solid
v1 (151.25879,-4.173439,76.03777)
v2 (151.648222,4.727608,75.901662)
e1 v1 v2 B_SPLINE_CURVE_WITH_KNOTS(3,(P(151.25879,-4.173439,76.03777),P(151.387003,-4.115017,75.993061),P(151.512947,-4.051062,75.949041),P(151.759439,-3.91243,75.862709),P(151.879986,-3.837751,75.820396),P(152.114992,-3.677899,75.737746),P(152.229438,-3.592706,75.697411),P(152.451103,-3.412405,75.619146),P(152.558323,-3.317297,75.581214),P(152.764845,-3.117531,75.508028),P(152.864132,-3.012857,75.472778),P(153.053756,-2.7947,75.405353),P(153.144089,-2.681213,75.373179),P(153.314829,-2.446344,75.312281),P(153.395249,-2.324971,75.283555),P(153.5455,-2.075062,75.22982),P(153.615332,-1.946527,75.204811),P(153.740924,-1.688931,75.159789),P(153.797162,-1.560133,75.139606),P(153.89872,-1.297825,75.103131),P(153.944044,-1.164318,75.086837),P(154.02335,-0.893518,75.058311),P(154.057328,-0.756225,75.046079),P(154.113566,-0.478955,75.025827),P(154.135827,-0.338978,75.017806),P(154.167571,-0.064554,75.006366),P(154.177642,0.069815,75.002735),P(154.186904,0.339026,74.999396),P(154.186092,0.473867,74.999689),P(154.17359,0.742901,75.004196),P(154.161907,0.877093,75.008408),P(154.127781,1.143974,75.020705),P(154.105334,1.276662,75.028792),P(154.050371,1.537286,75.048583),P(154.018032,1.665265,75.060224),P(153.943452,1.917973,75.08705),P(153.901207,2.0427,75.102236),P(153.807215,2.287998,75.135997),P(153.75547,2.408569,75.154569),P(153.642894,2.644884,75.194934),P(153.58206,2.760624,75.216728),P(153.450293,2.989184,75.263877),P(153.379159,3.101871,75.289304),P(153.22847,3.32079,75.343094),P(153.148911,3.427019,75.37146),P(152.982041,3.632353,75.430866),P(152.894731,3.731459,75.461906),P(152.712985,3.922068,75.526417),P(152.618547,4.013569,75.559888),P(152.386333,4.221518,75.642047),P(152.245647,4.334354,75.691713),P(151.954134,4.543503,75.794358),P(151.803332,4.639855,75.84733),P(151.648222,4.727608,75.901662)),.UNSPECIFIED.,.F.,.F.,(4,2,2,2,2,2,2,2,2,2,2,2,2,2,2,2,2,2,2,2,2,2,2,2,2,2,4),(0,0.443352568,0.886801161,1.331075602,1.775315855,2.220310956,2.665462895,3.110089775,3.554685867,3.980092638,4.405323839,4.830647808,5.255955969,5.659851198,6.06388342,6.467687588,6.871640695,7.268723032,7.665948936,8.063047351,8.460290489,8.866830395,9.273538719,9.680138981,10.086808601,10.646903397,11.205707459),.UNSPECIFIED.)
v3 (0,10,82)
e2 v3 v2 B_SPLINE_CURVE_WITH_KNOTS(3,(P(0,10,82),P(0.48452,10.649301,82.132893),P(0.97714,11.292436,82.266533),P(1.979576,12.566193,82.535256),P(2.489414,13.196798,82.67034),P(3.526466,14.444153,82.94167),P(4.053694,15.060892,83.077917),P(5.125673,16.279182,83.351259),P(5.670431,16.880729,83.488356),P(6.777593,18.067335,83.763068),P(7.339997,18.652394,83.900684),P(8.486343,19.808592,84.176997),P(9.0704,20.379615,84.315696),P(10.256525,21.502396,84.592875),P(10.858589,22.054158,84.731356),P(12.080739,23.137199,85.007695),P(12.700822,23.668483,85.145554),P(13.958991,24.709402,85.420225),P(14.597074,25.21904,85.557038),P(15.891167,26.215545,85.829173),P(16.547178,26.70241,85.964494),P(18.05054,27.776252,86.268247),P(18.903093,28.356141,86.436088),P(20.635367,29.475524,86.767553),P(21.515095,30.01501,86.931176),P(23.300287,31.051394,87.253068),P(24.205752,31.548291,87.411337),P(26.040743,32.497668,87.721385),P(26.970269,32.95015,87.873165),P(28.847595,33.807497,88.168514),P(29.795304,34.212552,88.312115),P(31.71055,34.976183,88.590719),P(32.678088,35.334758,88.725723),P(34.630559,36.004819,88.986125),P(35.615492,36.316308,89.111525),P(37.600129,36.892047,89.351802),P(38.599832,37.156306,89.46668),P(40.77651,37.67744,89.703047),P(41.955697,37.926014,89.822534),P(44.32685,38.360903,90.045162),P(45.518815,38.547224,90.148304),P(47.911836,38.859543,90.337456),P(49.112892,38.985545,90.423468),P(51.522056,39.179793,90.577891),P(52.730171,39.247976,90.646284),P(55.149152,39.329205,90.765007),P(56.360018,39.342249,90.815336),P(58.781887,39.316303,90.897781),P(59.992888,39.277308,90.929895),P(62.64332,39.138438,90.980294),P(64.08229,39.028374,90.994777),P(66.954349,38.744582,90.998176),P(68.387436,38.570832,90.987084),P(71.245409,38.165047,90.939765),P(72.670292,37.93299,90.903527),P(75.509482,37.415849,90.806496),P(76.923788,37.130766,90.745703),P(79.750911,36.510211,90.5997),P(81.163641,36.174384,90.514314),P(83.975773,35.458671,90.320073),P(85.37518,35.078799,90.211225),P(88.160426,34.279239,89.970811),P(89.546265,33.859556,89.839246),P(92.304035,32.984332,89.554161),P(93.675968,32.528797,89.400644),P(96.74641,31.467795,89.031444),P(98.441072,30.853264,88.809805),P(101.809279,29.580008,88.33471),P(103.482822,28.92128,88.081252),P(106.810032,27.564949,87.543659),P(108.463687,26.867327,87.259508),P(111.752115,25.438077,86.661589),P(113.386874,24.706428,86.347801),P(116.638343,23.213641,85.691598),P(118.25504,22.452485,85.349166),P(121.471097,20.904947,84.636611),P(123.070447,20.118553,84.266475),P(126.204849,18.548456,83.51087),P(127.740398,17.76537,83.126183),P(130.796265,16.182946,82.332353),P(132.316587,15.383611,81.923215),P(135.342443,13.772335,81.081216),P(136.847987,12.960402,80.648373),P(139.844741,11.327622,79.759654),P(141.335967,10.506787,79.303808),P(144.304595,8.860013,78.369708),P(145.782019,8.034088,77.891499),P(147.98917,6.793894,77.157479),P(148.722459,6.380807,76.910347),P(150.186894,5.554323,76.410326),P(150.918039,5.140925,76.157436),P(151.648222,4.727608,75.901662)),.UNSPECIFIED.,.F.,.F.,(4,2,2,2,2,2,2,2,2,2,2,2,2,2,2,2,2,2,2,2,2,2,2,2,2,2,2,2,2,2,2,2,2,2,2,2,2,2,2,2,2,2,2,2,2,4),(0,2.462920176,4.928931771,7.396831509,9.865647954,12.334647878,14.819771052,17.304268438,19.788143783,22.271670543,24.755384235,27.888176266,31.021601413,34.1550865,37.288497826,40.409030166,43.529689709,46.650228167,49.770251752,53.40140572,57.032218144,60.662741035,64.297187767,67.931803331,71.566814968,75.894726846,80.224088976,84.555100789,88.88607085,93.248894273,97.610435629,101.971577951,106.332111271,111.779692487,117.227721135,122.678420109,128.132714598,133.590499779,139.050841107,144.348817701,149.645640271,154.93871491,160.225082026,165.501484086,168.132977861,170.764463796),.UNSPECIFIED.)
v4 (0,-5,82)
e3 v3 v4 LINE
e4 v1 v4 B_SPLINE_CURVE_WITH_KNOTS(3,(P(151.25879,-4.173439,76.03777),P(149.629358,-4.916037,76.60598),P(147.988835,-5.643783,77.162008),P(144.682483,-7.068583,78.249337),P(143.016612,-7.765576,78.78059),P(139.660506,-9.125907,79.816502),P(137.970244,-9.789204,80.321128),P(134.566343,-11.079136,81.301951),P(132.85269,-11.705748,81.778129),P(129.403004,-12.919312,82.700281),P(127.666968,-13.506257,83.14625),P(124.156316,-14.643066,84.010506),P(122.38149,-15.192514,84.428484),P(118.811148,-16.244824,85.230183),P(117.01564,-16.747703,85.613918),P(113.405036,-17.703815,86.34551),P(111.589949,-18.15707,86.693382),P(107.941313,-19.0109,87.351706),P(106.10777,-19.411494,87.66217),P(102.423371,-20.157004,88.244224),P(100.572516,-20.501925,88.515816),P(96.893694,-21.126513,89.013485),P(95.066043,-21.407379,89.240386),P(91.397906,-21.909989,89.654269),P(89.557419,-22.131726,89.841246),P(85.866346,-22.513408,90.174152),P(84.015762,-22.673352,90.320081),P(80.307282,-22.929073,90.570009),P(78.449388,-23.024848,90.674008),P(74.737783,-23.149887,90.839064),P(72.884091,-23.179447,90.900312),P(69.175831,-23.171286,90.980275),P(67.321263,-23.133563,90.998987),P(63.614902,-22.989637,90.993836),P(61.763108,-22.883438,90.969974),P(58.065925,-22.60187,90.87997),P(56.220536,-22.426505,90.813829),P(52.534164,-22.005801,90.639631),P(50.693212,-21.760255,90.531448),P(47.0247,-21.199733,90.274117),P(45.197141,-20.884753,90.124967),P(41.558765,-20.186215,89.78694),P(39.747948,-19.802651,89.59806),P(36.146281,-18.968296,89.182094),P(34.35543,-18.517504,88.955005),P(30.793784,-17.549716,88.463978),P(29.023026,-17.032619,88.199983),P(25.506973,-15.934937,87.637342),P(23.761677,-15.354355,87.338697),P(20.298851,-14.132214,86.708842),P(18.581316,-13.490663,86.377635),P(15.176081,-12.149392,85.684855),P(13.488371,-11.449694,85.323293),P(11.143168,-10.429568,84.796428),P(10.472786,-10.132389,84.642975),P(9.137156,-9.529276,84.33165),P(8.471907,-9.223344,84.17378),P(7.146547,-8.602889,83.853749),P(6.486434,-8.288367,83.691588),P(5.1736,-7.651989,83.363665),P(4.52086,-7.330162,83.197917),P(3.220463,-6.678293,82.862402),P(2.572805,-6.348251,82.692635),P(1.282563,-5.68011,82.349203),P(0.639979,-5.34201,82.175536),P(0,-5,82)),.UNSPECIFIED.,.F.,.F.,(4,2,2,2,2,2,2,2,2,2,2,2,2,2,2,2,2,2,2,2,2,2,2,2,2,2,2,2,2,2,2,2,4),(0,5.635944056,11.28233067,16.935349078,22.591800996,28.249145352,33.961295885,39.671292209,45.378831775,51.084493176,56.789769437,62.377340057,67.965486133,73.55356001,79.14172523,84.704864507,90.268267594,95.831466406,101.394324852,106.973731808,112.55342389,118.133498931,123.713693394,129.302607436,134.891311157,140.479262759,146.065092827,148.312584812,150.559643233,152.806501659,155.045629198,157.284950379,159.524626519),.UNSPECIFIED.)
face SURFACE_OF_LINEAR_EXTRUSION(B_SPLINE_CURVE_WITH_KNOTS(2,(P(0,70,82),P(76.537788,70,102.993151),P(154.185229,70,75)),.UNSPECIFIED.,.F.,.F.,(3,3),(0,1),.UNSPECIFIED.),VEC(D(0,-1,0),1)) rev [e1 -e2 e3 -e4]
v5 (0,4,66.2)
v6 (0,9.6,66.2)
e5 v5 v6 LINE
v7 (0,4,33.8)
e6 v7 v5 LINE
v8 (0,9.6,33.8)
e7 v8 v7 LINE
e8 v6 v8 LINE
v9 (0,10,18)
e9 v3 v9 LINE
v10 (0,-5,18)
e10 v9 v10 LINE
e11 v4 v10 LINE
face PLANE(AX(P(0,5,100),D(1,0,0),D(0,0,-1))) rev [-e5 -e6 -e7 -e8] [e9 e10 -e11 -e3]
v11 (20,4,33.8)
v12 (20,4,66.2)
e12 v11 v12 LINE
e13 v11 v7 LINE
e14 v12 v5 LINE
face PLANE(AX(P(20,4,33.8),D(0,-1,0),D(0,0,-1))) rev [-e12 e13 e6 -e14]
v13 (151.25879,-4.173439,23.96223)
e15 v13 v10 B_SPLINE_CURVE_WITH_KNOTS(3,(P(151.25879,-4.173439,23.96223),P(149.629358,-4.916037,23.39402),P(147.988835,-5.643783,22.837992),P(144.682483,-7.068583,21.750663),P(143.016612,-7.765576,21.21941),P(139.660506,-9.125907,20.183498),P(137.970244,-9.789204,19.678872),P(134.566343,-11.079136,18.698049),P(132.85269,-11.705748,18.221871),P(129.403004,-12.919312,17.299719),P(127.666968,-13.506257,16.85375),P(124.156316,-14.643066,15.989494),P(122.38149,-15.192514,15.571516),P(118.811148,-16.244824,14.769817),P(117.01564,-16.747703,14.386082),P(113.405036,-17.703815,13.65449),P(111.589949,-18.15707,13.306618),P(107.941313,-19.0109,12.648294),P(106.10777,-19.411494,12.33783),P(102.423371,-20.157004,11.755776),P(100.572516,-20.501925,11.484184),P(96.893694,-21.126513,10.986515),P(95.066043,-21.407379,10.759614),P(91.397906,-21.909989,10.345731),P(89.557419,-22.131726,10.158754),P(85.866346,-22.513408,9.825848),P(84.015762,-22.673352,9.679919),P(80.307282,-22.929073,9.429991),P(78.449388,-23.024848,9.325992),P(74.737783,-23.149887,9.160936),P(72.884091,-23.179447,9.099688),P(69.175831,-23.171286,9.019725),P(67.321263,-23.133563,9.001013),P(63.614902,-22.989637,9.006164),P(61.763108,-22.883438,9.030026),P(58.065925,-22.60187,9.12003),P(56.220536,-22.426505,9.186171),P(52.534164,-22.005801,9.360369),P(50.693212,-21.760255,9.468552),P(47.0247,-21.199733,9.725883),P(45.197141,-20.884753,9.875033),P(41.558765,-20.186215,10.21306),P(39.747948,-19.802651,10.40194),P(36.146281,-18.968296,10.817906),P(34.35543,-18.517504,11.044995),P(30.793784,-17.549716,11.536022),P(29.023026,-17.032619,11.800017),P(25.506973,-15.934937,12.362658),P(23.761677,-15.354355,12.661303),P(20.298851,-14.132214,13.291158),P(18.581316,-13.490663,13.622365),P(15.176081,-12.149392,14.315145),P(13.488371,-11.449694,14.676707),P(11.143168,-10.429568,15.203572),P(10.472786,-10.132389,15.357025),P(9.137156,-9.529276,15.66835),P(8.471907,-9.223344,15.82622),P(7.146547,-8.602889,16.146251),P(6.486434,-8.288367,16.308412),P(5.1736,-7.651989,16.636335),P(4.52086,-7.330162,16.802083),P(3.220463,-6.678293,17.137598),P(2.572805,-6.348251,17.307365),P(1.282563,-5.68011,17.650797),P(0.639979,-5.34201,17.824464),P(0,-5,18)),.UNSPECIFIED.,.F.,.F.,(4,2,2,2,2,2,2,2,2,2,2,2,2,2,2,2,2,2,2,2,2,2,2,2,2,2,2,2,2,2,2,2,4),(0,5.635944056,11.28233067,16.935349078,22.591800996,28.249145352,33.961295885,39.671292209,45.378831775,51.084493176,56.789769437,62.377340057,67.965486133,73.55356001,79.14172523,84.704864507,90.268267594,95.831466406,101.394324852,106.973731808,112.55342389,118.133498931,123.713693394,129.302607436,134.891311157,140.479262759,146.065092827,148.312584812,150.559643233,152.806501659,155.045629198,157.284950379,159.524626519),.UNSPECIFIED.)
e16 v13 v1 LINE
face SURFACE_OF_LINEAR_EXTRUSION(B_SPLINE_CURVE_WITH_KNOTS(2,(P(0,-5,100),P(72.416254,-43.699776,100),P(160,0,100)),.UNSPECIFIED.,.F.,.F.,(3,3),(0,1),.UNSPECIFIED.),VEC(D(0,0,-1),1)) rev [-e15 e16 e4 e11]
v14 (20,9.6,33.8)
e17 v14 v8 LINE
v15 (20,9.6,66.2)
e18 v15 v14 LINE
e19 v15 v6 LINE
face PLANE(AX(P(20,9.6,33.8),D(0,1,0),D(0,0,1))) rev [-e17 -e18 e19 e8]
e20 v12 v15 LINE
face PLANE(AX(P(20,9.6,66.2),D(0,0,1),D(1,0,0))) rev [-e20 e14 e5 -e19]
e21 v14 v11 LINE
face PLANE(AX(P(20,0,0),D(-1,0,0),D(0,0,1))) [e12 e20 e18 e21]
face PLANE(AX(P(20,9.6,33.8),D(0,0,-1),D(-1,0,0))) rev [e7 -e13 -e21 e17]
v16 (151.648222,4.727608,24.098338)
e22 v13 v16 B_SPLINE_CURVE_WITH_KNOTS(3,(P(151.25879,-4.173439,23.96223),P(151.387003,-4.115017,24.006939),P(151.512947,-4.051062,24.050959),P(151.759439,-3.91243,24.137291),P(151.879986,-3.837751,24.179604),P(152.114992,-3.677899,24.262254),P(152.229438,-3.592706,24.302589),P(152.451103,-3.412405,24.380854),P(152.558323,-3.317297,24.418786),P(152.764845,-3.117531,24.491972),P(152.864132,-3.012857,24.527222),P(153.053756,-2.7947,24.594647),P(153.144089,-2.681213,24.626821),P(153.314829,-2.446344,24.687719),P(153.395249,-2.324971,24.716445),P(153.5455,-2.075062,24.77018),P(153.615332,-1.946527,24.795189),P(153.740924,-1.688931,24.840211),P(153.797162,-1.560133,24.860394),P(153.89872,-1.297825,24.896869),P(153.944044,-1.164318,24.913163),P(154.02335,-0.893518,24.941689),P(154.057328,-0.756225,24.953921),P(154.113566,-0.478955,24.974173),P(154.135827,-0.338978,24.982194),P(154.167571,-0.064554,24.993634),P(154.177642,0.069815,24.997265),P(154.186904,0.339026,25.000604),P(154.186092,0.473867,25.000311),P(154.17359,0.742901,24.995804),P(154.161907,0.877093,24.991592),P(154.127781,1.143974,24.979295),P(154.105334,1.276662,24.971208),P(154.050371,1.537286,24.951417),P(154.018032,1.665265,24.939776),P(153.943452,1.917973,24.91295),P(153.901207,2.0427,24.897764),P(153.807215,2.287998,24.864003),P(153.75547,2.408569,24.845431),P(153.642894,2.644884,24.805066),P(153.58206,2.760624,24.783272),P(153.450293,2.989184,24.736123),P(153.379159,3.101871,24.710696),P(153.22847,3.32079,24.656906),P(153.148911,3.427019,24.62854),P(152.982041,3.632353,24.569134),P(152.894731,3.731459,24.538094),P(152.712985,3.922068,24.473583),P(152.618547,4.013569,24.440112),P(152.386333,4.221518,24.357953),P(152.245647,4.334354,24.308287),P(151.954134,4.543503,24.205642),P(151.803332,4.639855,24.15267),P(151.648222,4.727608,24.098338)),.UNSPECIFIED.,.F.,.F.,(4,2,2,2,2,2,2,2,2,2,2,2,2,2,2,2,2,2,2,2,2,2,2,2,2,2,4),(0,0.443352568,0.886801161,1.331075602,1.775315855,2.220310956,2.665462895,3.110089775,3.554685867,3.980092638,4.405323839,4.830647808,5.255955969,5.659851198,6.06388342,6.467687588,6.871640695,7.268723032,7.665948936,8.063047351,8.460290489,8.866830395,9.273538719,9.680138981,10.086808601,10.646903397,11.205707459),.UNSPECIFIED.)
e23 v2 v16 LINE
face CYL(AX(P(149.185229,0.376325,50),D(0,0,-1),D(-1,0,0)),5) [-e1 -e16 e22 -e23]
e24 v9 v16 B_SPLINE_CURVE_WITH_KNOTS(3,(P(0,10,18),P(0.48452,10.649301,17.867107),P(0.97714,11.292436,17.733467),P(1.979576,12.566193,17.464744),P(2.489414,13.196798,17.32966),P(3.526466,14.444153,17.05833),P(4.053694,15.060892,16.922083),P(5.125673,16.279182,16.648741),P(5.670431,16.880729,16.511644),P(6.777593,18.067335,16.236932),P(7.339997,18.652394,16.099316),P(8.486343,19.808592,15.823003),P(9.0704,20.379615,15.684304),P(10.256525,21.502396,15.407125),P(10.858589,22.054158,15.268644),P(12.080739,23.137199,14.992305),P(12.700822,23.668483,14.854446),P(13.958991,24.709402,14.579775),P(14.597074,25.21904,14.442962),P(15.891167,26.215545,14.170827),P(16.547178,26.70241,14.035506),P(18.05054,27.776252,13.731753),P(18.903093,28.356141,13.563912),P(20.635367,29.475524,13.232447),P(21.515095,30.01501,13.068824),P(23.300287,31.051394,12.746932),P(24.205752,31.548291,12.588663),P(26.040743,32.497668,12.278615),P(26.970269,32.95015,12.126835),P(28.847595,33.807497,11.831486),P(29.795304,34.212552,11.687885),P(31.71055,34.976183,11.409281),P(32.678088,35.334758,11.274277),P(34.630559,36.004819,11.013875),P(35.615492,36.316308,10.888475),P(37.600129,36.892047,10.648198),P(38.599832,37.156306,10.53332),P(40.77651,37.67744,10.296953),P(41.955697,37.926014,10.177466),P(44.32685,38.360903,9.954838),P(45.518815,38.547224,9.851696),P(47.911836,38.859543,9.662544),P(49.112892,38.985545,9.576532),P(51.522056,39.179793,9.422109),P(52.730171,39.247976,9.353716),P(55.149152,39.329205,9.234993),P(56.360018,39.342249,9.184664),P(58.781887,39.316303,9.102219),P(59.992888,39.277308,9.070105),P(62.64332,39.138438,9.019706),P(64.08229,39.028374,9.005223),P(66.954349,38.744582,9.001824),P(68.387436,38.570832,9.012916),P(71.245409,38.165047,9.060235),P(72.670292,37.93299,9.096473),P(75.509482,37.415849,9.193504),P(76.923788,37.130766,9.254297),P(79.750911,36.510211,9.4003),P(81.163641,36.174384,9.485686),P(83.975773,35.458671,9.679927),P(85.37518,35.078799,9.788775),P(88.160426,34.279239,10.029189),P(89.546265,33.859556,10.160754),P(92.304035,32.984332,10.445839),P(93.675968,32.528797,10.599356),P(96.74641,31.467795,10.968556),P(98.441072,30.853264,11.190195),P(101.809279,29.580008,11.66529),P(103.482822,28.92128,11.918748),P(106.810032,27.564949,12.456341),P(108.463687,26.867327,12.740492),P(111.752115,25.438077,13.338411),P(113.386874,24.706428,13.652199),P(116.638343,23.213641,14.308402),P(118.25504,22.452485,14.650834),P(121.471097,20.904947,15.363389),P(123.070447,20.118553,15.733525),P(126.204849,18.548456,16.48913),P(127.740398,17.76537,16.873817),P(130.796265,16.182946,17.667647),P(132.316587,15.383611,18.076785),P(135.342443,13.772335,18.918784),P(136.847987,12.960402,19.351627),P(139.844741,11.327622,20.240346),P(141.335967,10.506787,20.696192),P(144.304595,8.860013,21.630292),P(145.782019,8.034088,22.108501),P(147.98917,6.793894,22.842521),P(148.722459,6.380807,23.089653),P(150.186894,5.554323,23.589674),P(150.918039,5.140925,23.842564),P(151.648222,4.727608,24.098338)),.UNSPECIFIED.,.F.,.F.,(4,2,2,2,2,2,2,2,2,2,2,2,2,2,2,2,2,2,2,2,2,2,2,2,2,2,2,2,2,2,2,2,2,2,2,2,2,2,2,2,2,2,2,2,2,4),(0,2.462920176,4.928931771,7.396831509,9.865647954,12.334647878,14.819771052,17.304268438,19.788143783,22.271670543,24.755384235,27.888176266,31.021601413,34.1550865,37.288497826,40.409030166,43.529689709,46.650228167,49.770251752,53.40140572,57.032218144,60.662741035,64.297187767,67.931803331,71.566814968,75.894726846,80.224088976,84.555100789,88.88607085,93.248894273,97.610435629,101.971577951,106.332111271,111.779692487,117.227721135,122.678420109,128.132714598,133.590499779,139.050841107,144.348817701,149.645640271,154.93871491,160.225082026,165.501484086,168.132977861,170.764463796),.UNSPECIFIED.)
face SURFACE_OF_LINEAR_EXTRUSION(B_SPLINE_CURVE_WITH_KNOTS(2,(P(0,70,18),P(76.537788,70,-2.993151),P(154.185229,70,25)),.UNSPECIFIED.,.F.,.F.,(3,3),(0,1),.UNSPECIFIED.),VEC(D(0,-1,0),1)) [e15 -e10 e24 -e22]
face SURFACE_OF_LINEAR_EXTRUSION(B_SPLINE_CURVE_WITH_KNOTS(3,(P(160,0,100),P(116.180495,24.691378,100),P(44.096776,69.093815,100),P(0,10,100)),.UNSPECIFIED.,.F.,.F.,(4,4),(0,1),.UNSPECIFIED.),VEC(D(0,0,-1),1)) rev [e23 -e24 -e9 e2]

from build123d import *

# Parameters (mm, degrees)
BOSS_EXTRUDE1_DEPTH = 100
SKETCH2_W           = 32.4
SKETCH2_H           = 5.6
CUT_EXTRUDE1_DEPTH  = 20
FILLET2_R           = 5
CUT_EXTRUDE2_START  = -24
CUT_EXTRUDE2_DEPTH  = 64


with BuildPart() as part:
    # Sketch1 → Boss-Extrude1 (new body)
    with BuildSketch(Plane.XY):
        with BuildLine():
            Line((0, 5), (0, 10))
            add(Edge.make_bspline(
                [(0, 10), (44.096776055, 69.093814751), (116.180495262, 24.691377763), (160, 0)],
                knots=[0, 0, 0, 0, 1, 1, 1, 1], degree=3))
            add(Edge.make_bspline(
                [(0, -5), (72.416253581, -43.699775916), (160, 0)],
                knots=[0, 0, 0, 1, 1, 1], degree=2))
            Line((0, -5), (0, 0))
            Line((0, 0), (0, 5))
        make_face()
    extrude(amount=BOSS_EXTRUDE1_DEPTH)

    # Sketch2 → Cut-Extrude1 (cut)
    with BuildSketch(Plane.ZY):
        with Locations((50, 6.8)):
            Rectangle(SKETCH2_W, SKETCH2_H)
    extrude(amount=-CUT_EXTRUDE1_DEPTH, mode=Mode.SUBTRACT)

    # Fillet2
    fillet2_edges = [part.edges().sort_by_distance(p)[0] for p in [
        (160, 0, 50),
    ]]
    fillet(fillet2_edges, radius=FILLET2_R)

    # Cut-Extrude2: read off the stored shape, not the designer's step
    # Cut-Extrude2 outline → Cut-Extrude2 (cut)
    with BuildSketch(Plane(origin=(0, 0, 0), x_dir=(1, 0, 0), z_dir=(0, 1, 0)).offset(CUT_EXTRUDE2_START)):
        with BuildLine():
            add(Edge.make_bspline(
                [(0, -82), (76.537787844, -102.993151092), (154.18522925, -75)],
                knots=[0, 0, 0, 1, 1, 1], degree=2))
            Line((0, -82), (0, -100))
            Line((0, -100), (154.18522925, -100))
            Line((154.18522925, -100), (154.18522925, -75))
        make_face()
        with BuildLine():
            Line((154.185229284, 0), (0, 0))
            Line((0, 0), (0, -18))
            add(Edge.make_bspline(
                [(0, -18), (76.537787844, 2.993151092), (154.18522925, -25)],
                knots=[0, 0, 0, 1, 1, 1], degree=2))
            Line((154.18522925, -25), (154.185229284, 0))
        make_face()
    extrude(amount=CUT_EXTRUDE2_DEPTH, mode=Mode.SUBTRACT)


solid = part.part
